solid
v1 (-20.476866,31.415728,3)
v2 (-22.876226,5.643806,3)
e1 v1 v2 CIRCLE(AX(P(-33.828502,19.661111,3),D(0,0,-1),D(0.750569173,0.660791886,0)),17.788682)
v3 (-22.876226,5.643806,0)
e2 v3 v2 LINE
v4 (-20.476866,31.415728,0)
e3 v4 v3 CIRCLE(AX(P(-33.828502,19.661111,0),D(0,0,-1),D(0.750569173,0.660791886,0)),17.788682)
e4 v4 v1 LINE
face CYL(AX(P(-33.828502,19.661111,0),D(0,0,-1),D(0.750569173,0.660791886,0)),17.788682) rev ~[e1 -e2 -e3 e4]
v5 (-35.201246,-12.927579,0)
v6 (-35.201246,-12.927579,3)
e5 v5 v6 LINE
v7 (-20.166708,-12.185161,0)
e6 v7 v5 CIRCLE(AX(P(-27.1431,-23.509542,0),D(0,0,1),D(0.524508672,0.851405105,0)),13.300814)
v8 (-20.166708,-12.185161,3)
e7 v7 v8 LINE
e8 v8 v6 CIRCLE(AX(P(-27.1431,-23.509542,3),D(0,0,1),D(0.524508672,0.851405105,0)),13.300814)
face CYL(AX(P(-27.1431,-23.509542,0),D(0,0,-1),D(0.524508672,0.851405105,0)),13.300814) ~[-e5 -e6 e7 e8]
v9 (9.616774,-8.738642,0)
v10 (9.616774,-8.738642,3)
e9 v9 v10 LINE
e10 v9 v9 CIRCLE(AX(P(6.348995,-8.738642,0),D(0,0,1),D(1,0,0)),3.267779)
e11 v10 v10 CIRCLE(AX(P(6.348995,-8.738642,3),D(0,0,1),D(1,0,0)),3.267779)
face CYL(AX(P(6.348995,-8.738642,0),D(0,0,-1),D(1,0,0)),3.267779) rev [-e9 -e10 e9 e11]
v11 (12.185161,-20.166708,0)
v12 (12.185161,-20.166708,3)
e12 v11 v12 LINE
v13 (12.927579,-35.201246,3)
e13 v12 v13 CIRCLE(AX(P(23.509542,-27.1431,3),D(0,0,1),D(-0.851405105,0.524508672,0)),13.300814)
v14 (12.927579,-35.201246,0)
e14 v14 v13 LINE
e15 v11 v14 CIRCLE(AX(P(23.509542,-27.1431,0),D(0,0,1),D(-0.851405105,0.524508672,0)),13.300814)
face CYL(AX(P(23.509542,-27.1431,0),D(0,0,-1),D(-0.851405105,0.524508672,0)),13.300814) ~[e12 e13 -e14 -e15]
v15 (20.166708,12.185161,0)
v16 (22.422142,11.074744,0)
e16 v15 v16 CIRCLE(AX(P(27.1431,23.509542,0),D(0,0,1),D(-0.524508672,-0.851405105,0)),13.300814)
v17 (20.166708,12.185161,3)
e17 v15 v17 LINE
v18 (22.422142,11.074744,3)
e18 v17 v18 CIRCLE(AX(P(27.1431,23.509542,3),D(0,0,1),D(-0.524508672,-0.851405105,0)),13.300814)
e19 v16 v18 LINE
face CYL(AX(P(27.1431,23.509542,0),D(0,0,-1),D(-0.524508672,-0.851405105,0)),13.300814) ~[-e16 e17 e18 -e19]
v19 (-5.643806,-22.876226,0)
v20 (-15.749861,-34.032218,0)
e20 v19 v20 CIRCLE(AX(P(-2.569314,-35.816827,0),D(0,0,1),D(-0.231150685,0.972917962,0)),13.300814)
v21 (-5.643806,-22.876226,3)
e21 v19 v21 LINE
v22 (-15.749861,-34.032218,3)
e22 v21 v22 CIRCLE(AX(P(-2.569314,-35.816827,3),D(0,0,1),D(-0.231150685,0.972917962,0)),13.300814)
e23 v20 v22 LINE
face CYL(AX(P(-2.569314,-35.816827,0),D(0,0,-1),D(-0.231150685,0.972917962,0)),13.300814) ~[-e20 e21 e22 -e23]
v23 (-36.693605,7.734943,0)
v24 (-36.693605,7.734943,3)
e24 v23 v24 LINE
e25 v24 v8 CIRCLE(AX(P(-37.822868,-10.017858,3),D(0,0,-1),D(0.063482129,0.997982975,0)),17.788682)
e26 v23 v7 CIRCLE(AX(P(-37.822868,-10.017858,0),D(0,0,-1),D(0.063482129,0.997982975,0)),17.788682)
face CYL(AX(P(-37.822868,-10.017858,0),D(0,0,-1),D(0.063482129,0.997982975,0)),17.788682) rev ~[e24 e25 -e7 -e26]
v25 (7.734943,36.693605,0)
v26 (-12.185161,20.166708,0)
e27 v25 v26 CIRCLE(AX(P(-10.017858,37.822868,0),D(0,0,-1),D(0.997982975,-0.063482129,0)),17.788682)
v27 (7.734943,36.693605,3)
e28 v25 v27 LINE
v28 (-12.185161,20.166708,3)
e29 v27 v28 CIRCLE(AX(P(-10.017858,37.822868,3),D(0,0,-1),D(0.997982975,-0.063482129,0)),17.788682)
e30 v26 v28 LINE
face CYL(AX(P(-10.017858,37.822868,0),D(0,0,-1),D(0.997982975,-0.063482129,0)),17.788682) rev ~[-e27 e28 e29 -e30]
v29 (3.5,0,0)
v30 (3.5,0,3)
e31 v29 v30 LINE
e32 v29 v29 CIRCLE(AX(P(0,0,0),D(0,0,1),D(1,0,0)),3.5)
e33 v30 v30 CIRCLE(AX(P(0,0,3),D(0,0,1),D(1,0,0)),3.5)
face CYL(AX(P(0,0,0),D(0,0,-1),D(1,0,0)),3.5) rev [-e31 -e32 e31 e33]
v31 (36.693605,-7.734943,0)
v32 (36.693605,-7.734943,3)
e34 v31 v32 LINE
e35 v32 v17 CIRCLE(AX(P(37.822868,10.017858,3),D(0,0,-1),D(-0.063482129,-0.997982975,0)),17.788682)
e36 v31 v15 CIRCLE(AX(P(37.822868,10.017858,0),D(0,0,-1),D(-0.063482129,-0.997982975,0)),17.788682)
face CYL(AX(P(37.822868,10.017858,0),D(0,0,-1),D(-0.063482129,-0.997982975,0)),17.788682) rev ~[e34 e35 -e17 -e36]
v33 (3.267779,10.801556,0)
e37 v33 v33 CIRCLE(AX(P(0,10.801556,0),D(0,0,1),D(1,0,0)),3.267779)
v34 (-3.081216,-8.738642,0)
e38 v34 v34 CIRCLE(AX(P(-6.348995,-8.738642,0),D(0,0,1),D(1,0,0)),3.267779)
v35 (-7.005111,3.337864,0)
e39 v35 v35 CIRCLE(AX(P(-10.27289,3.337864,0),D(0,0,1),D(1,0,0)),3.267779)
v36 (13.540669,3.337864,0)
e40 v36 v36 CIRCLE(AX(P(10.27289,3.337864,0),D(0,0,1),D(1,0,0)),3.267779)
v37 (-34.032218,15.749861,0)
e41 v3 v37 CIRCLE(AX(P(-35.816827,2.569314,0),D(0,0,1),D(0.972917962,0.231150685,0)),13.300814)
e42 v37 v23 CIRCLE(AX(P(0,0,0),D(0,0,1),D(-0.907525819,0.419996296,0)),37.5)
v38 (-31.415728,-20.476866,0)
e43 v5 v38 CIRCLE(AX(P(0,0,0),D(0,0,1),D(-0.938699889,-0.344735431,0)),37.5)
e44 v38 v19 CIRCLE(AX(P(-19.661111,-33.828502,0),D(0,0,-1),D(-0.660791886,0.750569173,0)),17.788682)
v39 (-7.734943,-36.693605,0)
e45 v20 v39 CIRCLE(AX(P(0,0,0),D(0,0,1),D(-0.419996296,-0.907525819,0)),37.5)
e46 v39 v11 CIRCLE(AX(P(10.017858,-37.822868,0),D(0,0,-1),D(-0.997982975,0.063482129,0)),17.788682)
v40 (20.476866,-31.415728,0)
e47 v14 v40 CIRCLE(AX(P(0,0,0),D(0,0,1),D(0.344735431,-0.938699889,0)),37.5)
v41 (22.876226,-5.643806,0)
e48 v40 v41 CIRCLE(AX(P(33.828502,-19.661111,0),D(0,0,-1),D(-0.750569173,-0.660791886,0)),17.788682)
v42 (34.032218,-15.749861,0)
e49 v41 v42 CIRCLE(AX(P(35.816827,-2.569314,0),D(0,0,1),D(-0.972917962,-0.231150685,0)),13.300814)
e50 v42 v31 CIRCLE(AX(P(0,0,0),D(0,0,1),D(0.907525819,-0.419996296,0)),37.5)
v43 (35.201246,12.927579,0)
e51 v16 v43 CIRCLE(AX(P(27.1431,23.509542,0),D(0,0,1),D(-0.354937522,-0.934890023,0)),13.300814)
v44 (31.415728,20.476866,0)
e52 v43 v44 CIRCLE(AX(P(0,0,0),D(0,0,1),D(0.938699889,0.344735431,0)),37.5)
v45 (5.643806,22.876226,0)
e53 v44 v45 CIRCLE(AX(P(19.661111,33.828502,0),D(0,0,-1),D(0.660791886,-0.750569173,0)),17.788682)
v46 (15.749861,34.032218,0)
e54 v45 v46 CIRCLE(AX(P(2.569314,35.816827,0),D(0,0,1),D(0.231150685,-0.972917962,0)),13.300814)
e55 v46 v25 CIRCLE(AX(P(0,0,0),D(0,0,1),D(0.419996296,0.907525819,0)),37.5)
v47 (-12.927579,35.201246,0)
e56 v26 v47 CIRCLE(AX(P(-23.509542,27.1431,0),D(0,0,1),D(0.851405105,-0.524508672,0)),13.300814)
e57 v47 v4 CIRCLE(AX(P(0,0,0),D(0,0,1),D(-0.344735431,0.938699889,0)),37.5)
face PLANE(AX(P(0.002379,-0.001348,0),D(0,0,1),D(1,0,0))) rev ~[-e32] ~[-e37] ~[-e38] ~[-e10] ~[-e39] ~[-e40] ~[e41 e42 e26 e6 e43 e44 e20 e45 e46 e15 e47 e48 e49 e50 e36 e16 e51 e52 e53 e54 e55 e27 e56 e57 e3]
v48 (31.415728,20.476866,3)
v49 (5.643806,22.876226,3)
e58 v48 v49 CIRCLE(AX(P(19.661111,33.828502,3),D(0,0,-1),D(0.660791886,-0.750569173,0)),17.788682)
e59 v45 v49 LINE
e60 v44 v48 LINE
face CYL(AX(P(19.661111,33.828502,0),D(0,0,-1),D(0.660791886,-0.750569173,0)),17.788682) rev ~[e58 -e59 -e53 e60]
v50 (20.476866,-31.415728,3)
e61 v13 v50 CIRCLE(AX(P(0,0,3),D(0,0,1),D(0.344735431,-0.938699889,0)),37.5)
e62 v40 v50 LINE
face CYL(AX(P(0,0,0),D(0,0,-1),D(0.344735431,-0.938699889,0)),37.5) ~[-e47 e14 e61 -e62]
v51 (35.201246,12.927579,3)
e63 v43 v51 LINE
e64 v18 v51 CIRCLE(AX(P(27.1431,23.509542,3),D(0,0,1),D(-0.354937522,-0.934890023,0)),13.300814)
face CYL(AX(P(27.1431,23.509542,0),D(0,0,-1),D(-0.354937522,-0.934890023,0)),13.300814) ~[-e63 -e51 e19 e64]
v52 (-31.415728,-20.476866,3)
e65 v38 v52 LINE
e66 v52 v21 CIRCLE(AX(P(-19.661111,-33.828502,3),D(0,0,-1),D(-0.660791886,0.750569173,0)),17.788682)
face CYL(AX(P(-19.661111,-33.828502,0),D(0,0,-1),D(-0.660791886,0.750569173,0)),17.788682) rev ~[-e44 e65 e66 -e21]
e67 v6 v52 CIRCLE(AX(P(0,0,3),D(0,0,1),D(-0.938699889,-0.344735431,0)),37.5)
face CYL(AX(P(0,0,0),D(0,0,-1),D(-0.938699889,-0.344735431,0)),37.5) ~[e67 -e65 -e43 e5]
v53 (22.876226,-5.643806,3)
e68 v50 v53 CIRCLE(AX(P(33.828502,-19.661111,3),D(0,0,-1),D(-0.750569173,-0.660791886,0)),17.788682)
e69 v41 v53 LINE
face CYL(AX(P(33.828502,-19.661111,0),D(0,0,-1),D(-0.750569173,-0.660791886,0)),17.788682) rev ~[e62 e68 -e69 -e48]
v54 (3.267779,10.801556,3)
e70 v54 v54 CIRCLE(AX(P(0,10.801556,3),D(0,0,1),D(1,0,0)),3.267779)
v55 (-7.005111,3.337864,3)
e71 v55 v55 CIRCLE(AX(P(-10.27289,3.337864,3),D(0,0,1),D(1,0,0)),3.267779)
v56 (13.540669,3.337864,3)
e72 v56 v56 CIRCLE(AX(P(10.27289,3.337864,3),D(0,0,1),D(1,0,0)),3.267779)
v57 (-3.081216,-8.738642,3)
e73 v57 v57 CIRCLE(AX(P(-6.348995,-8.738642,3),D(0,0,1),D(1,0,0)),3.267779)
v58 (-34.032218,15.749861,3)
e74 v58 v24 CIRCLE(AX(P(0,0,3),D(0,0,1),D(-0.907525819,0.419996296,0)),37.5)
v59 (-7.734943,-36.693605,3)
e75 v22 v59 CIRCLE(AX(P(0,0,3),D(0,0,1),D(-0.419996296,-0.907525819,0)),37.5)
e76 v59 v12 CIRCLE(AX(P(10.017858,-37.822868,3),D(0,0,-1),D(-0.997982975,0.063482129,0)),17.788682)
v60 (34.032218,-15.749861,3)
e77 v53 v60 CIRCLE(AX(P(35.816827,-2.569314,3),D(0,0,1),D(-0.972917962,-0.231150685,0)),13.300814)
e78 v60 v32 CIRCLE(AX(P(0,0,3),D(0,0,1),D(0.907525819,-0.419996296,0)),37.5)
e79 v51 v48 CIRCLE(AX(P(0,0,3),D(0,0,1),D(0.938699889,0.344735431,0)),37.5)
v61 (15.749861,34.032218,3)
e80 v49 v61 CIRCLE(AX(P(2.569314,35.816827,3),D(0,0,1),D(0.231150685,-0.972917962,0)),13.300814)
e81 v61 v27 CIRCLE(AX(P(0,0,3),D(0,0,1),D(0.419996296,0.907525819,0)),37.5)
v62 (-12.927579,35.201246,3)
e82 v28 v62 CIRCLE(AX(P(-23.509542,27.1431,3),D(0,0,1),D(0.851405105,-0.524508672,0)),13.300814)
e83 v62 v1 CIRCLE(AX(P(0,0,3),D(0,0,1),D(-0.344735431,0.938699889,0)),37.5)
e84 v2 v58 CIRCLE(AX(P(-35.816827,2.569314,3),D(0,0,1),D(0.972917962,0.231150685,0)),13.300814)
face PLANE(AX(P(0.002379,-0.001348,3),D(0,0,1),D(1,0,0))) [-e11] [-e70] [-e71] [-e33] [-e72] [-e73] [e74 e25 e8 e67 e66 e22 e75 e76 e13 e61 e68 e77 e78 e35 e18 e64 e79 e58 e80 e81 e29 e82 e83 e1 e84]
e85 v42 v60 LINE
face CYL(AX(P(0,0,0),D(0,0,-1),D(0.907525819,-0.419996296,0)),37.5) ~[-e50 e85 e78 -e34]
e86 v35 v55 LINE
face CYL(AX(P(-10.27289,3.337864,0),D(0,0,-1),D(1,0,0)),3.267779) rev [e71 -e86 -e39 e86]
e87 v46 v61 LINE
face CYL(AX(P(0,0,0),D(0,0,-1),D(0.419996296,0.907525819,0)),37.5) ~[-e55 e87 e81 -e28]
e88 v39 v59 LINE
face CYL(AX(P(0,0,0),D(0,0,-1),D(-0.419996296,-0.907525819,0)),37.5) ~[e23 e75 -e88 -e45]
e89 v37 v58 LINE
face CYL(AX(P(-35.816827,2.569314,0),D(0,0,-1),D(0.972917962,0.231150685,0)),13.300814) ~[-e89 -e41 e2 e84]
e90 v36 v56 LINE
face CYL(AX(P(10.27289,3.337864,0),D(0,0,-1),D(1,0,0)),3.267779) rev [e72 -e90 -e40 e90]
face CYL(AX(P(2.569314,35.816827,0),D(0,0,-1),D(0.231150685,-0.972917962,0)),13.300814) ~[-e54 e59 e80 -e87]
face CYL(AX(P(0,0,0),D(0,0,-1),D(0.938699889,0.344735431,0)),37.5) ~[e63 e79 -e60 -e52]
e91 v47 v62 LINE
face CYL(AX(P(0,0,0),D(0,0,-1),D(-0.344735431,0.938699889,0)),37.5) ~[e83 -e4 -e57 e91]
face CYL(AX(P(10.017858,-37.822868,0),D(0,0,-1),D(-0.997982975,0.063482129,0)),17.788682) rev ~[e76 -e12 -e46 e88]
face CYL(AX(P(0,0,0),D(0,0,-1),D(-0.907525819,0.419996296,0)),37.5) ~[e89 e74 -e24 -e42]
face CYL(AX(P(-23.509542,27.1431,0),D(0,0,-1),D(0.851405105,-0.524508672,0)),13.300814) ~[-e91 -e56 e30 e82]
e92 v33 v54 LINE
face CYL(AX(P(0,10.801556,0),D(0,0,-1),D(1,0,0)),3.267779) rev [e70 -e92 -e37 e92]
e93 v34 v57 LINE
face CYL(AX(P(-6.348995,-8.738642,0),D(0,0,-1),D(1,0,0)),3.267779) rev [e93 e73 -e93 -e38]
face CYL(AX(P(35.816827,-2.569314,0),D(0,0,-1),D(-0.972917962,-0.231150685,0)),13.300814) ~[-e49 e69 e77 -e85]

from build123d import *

# Parameters (mm, degrees)
F0_R     = 3.2677789254
F0_R_2   = 3.5
F1_DEPTH = 3


# Not quite as in the source:
# - a feature names something its author has since deleted; it is built from what else it names


with BuildPart() as f1:
    # F0 (on Top) → F1 (new body)
    with BuildSketch(Plane.XY):
        with BuildLine():
            ThreePointArc((-12.185161002, 20.1667081565), (-10.2249151213, 27.7991061308), (-12.9275786797, 35.2012458513))
            ThreePointArc((-12.9275786797, 35.2012458513), (-16.80912748, 33.5216830329), (-20.4768659437, 31.4157279261))
            ThreePointArc((-20.4768659437, 31.4157279261), (-16.1164151017, 18.0121200855), (-22.876226066, 5.6438061173))
            ThreePointArc((-22.876226066, 5.6438061173), (-26.8870432753, 12.4268296367), (-34.0322181964, 15.7498610989))
            ThreePointArc((-34.0322181964, 15.7498610989), (-35.5892574163, 11.8175613624), (-36.6936050187, 7.7349434862))
            ThreePointArc((-36.6936050187, 7.7349434862), (-24.1325186628, 1.3404658492), (-20.1667081565, -12.185161002))
            ThreePointArc((-20.1667081565, -12.185161002), (-27.7991061308, -10.2249151213), (-35.2012458513, -12.9275786797))
            ThreePointArc((-35.2012458513, -12.9275786797), (-33.5216830329, -16.80912748), (-31.4157279261, -20.4768659437))
            ThreePointArc((-31.4157279261, -20.4768659437), (-18.0121200855, -16.1164151017), (-5.6438061173, -22.876226066))
            ThreePointArc((-5.6438061173, -22.876226066), (-12.4268296367, -26.8870432753), (-15.7498610989, -34.0322181964))
            ThreePointArc((-15.7498610989, -34.0322181964), (-11.8175613624, -35.5892574163), (-7.7349434862, -36.6936050187))
            ThreePointArc((-7.7349434862, -36.6936050187), (-1.3404658492, -24.1325186628), (12.185161002, -20.1667081565))
            ThreePointArc((12.185161002, -20.1667081565), (10.2249151213, -27.7991061308), (12.9275786797, -35.2012458513))
            ThreePointArc((12.9275786797, -35.2012458513), (16.80912748, -33.5216830329), (20.4768659437, -31.4157279261))
            ThreePointArc((20.4768659437, -31.4157279261), (16.1164151017, -18.0121200855), (22.876226066, -5.6438061173))
            ThreePointArc((22.876226066, -5.6438061173), (26.8870432753, -12.4268296367), (34.0322181964, -15.7498610989))
            ThreePointArc((34.0322181964, -15.7498610989), (35.5892574163, -11.8175613624), (36.6936050187, -7.7349434862))
            ThreePointArc((36.6936050187, -7.7349434862), (24.1325186628, -1.3404658492), (20.1667081565, 12.185161002))
            ThreePointArc((20.1667081565, 12.185161002), (21.2681317348, 11.5765458519), (22.4221424931, 11.0747436302))
            ThreePointArc((22.4221424931, 11.0747436302), (29.051621985, 10.3463660778), (35.2012458513, 12.9275786797))
            ThreePointArc((35.2012458513, 12.9275786797), (33.5216830329, 16.80912748), (31.4157279261, 20.4768659437))
            ThreePointArc((31.4157279261, 20.4768659437), (18.0121200855, 16.1164151017), (5.6438061173, 22.876226066))
            ThreePointArc((5.6438061173, 22.876226066), (12.4268296367, 26.8870432753), (15.7498610989, 34.0322181964))
            ThreePointArc((15.7498610989, 34.0322181964), (11.8175613624, 35.5892574163), (7.7349434862, 36.6936050187))
            ThreePointArc((7.7349434862, 36.6936050187), (1.3404658492, 24.1325186628), (-12.185161002, 20.1667081565))
        make_face()
        with Locations((-6.3489950769, -8.7386420371)):
            Circle(F0_R, mode=Mode.SUBTRACT)
        with Locations((6.3489950769, -8.7386420371)):
            Circle(F0_R, mode=Mode.SUBTRACT)
        with Locations((-10.2728898289, 3.3378642426)):
            Circle(F0_R, mode=Mode.SUBTRACT)
        Circle(F0_R_2, mode=Mode.SUBTRACT)
        with Locations((10.2728898289, 3.3378642426)):
            Circle(F0_R, mode=Mode.SUBTRACT)
        with Locations((0, 10.8015555888)):
            Circle(F0_R, mode=Mode.SUBTRACT)
    extrude(amount=F1_DEPTH)


solid = f1.part
